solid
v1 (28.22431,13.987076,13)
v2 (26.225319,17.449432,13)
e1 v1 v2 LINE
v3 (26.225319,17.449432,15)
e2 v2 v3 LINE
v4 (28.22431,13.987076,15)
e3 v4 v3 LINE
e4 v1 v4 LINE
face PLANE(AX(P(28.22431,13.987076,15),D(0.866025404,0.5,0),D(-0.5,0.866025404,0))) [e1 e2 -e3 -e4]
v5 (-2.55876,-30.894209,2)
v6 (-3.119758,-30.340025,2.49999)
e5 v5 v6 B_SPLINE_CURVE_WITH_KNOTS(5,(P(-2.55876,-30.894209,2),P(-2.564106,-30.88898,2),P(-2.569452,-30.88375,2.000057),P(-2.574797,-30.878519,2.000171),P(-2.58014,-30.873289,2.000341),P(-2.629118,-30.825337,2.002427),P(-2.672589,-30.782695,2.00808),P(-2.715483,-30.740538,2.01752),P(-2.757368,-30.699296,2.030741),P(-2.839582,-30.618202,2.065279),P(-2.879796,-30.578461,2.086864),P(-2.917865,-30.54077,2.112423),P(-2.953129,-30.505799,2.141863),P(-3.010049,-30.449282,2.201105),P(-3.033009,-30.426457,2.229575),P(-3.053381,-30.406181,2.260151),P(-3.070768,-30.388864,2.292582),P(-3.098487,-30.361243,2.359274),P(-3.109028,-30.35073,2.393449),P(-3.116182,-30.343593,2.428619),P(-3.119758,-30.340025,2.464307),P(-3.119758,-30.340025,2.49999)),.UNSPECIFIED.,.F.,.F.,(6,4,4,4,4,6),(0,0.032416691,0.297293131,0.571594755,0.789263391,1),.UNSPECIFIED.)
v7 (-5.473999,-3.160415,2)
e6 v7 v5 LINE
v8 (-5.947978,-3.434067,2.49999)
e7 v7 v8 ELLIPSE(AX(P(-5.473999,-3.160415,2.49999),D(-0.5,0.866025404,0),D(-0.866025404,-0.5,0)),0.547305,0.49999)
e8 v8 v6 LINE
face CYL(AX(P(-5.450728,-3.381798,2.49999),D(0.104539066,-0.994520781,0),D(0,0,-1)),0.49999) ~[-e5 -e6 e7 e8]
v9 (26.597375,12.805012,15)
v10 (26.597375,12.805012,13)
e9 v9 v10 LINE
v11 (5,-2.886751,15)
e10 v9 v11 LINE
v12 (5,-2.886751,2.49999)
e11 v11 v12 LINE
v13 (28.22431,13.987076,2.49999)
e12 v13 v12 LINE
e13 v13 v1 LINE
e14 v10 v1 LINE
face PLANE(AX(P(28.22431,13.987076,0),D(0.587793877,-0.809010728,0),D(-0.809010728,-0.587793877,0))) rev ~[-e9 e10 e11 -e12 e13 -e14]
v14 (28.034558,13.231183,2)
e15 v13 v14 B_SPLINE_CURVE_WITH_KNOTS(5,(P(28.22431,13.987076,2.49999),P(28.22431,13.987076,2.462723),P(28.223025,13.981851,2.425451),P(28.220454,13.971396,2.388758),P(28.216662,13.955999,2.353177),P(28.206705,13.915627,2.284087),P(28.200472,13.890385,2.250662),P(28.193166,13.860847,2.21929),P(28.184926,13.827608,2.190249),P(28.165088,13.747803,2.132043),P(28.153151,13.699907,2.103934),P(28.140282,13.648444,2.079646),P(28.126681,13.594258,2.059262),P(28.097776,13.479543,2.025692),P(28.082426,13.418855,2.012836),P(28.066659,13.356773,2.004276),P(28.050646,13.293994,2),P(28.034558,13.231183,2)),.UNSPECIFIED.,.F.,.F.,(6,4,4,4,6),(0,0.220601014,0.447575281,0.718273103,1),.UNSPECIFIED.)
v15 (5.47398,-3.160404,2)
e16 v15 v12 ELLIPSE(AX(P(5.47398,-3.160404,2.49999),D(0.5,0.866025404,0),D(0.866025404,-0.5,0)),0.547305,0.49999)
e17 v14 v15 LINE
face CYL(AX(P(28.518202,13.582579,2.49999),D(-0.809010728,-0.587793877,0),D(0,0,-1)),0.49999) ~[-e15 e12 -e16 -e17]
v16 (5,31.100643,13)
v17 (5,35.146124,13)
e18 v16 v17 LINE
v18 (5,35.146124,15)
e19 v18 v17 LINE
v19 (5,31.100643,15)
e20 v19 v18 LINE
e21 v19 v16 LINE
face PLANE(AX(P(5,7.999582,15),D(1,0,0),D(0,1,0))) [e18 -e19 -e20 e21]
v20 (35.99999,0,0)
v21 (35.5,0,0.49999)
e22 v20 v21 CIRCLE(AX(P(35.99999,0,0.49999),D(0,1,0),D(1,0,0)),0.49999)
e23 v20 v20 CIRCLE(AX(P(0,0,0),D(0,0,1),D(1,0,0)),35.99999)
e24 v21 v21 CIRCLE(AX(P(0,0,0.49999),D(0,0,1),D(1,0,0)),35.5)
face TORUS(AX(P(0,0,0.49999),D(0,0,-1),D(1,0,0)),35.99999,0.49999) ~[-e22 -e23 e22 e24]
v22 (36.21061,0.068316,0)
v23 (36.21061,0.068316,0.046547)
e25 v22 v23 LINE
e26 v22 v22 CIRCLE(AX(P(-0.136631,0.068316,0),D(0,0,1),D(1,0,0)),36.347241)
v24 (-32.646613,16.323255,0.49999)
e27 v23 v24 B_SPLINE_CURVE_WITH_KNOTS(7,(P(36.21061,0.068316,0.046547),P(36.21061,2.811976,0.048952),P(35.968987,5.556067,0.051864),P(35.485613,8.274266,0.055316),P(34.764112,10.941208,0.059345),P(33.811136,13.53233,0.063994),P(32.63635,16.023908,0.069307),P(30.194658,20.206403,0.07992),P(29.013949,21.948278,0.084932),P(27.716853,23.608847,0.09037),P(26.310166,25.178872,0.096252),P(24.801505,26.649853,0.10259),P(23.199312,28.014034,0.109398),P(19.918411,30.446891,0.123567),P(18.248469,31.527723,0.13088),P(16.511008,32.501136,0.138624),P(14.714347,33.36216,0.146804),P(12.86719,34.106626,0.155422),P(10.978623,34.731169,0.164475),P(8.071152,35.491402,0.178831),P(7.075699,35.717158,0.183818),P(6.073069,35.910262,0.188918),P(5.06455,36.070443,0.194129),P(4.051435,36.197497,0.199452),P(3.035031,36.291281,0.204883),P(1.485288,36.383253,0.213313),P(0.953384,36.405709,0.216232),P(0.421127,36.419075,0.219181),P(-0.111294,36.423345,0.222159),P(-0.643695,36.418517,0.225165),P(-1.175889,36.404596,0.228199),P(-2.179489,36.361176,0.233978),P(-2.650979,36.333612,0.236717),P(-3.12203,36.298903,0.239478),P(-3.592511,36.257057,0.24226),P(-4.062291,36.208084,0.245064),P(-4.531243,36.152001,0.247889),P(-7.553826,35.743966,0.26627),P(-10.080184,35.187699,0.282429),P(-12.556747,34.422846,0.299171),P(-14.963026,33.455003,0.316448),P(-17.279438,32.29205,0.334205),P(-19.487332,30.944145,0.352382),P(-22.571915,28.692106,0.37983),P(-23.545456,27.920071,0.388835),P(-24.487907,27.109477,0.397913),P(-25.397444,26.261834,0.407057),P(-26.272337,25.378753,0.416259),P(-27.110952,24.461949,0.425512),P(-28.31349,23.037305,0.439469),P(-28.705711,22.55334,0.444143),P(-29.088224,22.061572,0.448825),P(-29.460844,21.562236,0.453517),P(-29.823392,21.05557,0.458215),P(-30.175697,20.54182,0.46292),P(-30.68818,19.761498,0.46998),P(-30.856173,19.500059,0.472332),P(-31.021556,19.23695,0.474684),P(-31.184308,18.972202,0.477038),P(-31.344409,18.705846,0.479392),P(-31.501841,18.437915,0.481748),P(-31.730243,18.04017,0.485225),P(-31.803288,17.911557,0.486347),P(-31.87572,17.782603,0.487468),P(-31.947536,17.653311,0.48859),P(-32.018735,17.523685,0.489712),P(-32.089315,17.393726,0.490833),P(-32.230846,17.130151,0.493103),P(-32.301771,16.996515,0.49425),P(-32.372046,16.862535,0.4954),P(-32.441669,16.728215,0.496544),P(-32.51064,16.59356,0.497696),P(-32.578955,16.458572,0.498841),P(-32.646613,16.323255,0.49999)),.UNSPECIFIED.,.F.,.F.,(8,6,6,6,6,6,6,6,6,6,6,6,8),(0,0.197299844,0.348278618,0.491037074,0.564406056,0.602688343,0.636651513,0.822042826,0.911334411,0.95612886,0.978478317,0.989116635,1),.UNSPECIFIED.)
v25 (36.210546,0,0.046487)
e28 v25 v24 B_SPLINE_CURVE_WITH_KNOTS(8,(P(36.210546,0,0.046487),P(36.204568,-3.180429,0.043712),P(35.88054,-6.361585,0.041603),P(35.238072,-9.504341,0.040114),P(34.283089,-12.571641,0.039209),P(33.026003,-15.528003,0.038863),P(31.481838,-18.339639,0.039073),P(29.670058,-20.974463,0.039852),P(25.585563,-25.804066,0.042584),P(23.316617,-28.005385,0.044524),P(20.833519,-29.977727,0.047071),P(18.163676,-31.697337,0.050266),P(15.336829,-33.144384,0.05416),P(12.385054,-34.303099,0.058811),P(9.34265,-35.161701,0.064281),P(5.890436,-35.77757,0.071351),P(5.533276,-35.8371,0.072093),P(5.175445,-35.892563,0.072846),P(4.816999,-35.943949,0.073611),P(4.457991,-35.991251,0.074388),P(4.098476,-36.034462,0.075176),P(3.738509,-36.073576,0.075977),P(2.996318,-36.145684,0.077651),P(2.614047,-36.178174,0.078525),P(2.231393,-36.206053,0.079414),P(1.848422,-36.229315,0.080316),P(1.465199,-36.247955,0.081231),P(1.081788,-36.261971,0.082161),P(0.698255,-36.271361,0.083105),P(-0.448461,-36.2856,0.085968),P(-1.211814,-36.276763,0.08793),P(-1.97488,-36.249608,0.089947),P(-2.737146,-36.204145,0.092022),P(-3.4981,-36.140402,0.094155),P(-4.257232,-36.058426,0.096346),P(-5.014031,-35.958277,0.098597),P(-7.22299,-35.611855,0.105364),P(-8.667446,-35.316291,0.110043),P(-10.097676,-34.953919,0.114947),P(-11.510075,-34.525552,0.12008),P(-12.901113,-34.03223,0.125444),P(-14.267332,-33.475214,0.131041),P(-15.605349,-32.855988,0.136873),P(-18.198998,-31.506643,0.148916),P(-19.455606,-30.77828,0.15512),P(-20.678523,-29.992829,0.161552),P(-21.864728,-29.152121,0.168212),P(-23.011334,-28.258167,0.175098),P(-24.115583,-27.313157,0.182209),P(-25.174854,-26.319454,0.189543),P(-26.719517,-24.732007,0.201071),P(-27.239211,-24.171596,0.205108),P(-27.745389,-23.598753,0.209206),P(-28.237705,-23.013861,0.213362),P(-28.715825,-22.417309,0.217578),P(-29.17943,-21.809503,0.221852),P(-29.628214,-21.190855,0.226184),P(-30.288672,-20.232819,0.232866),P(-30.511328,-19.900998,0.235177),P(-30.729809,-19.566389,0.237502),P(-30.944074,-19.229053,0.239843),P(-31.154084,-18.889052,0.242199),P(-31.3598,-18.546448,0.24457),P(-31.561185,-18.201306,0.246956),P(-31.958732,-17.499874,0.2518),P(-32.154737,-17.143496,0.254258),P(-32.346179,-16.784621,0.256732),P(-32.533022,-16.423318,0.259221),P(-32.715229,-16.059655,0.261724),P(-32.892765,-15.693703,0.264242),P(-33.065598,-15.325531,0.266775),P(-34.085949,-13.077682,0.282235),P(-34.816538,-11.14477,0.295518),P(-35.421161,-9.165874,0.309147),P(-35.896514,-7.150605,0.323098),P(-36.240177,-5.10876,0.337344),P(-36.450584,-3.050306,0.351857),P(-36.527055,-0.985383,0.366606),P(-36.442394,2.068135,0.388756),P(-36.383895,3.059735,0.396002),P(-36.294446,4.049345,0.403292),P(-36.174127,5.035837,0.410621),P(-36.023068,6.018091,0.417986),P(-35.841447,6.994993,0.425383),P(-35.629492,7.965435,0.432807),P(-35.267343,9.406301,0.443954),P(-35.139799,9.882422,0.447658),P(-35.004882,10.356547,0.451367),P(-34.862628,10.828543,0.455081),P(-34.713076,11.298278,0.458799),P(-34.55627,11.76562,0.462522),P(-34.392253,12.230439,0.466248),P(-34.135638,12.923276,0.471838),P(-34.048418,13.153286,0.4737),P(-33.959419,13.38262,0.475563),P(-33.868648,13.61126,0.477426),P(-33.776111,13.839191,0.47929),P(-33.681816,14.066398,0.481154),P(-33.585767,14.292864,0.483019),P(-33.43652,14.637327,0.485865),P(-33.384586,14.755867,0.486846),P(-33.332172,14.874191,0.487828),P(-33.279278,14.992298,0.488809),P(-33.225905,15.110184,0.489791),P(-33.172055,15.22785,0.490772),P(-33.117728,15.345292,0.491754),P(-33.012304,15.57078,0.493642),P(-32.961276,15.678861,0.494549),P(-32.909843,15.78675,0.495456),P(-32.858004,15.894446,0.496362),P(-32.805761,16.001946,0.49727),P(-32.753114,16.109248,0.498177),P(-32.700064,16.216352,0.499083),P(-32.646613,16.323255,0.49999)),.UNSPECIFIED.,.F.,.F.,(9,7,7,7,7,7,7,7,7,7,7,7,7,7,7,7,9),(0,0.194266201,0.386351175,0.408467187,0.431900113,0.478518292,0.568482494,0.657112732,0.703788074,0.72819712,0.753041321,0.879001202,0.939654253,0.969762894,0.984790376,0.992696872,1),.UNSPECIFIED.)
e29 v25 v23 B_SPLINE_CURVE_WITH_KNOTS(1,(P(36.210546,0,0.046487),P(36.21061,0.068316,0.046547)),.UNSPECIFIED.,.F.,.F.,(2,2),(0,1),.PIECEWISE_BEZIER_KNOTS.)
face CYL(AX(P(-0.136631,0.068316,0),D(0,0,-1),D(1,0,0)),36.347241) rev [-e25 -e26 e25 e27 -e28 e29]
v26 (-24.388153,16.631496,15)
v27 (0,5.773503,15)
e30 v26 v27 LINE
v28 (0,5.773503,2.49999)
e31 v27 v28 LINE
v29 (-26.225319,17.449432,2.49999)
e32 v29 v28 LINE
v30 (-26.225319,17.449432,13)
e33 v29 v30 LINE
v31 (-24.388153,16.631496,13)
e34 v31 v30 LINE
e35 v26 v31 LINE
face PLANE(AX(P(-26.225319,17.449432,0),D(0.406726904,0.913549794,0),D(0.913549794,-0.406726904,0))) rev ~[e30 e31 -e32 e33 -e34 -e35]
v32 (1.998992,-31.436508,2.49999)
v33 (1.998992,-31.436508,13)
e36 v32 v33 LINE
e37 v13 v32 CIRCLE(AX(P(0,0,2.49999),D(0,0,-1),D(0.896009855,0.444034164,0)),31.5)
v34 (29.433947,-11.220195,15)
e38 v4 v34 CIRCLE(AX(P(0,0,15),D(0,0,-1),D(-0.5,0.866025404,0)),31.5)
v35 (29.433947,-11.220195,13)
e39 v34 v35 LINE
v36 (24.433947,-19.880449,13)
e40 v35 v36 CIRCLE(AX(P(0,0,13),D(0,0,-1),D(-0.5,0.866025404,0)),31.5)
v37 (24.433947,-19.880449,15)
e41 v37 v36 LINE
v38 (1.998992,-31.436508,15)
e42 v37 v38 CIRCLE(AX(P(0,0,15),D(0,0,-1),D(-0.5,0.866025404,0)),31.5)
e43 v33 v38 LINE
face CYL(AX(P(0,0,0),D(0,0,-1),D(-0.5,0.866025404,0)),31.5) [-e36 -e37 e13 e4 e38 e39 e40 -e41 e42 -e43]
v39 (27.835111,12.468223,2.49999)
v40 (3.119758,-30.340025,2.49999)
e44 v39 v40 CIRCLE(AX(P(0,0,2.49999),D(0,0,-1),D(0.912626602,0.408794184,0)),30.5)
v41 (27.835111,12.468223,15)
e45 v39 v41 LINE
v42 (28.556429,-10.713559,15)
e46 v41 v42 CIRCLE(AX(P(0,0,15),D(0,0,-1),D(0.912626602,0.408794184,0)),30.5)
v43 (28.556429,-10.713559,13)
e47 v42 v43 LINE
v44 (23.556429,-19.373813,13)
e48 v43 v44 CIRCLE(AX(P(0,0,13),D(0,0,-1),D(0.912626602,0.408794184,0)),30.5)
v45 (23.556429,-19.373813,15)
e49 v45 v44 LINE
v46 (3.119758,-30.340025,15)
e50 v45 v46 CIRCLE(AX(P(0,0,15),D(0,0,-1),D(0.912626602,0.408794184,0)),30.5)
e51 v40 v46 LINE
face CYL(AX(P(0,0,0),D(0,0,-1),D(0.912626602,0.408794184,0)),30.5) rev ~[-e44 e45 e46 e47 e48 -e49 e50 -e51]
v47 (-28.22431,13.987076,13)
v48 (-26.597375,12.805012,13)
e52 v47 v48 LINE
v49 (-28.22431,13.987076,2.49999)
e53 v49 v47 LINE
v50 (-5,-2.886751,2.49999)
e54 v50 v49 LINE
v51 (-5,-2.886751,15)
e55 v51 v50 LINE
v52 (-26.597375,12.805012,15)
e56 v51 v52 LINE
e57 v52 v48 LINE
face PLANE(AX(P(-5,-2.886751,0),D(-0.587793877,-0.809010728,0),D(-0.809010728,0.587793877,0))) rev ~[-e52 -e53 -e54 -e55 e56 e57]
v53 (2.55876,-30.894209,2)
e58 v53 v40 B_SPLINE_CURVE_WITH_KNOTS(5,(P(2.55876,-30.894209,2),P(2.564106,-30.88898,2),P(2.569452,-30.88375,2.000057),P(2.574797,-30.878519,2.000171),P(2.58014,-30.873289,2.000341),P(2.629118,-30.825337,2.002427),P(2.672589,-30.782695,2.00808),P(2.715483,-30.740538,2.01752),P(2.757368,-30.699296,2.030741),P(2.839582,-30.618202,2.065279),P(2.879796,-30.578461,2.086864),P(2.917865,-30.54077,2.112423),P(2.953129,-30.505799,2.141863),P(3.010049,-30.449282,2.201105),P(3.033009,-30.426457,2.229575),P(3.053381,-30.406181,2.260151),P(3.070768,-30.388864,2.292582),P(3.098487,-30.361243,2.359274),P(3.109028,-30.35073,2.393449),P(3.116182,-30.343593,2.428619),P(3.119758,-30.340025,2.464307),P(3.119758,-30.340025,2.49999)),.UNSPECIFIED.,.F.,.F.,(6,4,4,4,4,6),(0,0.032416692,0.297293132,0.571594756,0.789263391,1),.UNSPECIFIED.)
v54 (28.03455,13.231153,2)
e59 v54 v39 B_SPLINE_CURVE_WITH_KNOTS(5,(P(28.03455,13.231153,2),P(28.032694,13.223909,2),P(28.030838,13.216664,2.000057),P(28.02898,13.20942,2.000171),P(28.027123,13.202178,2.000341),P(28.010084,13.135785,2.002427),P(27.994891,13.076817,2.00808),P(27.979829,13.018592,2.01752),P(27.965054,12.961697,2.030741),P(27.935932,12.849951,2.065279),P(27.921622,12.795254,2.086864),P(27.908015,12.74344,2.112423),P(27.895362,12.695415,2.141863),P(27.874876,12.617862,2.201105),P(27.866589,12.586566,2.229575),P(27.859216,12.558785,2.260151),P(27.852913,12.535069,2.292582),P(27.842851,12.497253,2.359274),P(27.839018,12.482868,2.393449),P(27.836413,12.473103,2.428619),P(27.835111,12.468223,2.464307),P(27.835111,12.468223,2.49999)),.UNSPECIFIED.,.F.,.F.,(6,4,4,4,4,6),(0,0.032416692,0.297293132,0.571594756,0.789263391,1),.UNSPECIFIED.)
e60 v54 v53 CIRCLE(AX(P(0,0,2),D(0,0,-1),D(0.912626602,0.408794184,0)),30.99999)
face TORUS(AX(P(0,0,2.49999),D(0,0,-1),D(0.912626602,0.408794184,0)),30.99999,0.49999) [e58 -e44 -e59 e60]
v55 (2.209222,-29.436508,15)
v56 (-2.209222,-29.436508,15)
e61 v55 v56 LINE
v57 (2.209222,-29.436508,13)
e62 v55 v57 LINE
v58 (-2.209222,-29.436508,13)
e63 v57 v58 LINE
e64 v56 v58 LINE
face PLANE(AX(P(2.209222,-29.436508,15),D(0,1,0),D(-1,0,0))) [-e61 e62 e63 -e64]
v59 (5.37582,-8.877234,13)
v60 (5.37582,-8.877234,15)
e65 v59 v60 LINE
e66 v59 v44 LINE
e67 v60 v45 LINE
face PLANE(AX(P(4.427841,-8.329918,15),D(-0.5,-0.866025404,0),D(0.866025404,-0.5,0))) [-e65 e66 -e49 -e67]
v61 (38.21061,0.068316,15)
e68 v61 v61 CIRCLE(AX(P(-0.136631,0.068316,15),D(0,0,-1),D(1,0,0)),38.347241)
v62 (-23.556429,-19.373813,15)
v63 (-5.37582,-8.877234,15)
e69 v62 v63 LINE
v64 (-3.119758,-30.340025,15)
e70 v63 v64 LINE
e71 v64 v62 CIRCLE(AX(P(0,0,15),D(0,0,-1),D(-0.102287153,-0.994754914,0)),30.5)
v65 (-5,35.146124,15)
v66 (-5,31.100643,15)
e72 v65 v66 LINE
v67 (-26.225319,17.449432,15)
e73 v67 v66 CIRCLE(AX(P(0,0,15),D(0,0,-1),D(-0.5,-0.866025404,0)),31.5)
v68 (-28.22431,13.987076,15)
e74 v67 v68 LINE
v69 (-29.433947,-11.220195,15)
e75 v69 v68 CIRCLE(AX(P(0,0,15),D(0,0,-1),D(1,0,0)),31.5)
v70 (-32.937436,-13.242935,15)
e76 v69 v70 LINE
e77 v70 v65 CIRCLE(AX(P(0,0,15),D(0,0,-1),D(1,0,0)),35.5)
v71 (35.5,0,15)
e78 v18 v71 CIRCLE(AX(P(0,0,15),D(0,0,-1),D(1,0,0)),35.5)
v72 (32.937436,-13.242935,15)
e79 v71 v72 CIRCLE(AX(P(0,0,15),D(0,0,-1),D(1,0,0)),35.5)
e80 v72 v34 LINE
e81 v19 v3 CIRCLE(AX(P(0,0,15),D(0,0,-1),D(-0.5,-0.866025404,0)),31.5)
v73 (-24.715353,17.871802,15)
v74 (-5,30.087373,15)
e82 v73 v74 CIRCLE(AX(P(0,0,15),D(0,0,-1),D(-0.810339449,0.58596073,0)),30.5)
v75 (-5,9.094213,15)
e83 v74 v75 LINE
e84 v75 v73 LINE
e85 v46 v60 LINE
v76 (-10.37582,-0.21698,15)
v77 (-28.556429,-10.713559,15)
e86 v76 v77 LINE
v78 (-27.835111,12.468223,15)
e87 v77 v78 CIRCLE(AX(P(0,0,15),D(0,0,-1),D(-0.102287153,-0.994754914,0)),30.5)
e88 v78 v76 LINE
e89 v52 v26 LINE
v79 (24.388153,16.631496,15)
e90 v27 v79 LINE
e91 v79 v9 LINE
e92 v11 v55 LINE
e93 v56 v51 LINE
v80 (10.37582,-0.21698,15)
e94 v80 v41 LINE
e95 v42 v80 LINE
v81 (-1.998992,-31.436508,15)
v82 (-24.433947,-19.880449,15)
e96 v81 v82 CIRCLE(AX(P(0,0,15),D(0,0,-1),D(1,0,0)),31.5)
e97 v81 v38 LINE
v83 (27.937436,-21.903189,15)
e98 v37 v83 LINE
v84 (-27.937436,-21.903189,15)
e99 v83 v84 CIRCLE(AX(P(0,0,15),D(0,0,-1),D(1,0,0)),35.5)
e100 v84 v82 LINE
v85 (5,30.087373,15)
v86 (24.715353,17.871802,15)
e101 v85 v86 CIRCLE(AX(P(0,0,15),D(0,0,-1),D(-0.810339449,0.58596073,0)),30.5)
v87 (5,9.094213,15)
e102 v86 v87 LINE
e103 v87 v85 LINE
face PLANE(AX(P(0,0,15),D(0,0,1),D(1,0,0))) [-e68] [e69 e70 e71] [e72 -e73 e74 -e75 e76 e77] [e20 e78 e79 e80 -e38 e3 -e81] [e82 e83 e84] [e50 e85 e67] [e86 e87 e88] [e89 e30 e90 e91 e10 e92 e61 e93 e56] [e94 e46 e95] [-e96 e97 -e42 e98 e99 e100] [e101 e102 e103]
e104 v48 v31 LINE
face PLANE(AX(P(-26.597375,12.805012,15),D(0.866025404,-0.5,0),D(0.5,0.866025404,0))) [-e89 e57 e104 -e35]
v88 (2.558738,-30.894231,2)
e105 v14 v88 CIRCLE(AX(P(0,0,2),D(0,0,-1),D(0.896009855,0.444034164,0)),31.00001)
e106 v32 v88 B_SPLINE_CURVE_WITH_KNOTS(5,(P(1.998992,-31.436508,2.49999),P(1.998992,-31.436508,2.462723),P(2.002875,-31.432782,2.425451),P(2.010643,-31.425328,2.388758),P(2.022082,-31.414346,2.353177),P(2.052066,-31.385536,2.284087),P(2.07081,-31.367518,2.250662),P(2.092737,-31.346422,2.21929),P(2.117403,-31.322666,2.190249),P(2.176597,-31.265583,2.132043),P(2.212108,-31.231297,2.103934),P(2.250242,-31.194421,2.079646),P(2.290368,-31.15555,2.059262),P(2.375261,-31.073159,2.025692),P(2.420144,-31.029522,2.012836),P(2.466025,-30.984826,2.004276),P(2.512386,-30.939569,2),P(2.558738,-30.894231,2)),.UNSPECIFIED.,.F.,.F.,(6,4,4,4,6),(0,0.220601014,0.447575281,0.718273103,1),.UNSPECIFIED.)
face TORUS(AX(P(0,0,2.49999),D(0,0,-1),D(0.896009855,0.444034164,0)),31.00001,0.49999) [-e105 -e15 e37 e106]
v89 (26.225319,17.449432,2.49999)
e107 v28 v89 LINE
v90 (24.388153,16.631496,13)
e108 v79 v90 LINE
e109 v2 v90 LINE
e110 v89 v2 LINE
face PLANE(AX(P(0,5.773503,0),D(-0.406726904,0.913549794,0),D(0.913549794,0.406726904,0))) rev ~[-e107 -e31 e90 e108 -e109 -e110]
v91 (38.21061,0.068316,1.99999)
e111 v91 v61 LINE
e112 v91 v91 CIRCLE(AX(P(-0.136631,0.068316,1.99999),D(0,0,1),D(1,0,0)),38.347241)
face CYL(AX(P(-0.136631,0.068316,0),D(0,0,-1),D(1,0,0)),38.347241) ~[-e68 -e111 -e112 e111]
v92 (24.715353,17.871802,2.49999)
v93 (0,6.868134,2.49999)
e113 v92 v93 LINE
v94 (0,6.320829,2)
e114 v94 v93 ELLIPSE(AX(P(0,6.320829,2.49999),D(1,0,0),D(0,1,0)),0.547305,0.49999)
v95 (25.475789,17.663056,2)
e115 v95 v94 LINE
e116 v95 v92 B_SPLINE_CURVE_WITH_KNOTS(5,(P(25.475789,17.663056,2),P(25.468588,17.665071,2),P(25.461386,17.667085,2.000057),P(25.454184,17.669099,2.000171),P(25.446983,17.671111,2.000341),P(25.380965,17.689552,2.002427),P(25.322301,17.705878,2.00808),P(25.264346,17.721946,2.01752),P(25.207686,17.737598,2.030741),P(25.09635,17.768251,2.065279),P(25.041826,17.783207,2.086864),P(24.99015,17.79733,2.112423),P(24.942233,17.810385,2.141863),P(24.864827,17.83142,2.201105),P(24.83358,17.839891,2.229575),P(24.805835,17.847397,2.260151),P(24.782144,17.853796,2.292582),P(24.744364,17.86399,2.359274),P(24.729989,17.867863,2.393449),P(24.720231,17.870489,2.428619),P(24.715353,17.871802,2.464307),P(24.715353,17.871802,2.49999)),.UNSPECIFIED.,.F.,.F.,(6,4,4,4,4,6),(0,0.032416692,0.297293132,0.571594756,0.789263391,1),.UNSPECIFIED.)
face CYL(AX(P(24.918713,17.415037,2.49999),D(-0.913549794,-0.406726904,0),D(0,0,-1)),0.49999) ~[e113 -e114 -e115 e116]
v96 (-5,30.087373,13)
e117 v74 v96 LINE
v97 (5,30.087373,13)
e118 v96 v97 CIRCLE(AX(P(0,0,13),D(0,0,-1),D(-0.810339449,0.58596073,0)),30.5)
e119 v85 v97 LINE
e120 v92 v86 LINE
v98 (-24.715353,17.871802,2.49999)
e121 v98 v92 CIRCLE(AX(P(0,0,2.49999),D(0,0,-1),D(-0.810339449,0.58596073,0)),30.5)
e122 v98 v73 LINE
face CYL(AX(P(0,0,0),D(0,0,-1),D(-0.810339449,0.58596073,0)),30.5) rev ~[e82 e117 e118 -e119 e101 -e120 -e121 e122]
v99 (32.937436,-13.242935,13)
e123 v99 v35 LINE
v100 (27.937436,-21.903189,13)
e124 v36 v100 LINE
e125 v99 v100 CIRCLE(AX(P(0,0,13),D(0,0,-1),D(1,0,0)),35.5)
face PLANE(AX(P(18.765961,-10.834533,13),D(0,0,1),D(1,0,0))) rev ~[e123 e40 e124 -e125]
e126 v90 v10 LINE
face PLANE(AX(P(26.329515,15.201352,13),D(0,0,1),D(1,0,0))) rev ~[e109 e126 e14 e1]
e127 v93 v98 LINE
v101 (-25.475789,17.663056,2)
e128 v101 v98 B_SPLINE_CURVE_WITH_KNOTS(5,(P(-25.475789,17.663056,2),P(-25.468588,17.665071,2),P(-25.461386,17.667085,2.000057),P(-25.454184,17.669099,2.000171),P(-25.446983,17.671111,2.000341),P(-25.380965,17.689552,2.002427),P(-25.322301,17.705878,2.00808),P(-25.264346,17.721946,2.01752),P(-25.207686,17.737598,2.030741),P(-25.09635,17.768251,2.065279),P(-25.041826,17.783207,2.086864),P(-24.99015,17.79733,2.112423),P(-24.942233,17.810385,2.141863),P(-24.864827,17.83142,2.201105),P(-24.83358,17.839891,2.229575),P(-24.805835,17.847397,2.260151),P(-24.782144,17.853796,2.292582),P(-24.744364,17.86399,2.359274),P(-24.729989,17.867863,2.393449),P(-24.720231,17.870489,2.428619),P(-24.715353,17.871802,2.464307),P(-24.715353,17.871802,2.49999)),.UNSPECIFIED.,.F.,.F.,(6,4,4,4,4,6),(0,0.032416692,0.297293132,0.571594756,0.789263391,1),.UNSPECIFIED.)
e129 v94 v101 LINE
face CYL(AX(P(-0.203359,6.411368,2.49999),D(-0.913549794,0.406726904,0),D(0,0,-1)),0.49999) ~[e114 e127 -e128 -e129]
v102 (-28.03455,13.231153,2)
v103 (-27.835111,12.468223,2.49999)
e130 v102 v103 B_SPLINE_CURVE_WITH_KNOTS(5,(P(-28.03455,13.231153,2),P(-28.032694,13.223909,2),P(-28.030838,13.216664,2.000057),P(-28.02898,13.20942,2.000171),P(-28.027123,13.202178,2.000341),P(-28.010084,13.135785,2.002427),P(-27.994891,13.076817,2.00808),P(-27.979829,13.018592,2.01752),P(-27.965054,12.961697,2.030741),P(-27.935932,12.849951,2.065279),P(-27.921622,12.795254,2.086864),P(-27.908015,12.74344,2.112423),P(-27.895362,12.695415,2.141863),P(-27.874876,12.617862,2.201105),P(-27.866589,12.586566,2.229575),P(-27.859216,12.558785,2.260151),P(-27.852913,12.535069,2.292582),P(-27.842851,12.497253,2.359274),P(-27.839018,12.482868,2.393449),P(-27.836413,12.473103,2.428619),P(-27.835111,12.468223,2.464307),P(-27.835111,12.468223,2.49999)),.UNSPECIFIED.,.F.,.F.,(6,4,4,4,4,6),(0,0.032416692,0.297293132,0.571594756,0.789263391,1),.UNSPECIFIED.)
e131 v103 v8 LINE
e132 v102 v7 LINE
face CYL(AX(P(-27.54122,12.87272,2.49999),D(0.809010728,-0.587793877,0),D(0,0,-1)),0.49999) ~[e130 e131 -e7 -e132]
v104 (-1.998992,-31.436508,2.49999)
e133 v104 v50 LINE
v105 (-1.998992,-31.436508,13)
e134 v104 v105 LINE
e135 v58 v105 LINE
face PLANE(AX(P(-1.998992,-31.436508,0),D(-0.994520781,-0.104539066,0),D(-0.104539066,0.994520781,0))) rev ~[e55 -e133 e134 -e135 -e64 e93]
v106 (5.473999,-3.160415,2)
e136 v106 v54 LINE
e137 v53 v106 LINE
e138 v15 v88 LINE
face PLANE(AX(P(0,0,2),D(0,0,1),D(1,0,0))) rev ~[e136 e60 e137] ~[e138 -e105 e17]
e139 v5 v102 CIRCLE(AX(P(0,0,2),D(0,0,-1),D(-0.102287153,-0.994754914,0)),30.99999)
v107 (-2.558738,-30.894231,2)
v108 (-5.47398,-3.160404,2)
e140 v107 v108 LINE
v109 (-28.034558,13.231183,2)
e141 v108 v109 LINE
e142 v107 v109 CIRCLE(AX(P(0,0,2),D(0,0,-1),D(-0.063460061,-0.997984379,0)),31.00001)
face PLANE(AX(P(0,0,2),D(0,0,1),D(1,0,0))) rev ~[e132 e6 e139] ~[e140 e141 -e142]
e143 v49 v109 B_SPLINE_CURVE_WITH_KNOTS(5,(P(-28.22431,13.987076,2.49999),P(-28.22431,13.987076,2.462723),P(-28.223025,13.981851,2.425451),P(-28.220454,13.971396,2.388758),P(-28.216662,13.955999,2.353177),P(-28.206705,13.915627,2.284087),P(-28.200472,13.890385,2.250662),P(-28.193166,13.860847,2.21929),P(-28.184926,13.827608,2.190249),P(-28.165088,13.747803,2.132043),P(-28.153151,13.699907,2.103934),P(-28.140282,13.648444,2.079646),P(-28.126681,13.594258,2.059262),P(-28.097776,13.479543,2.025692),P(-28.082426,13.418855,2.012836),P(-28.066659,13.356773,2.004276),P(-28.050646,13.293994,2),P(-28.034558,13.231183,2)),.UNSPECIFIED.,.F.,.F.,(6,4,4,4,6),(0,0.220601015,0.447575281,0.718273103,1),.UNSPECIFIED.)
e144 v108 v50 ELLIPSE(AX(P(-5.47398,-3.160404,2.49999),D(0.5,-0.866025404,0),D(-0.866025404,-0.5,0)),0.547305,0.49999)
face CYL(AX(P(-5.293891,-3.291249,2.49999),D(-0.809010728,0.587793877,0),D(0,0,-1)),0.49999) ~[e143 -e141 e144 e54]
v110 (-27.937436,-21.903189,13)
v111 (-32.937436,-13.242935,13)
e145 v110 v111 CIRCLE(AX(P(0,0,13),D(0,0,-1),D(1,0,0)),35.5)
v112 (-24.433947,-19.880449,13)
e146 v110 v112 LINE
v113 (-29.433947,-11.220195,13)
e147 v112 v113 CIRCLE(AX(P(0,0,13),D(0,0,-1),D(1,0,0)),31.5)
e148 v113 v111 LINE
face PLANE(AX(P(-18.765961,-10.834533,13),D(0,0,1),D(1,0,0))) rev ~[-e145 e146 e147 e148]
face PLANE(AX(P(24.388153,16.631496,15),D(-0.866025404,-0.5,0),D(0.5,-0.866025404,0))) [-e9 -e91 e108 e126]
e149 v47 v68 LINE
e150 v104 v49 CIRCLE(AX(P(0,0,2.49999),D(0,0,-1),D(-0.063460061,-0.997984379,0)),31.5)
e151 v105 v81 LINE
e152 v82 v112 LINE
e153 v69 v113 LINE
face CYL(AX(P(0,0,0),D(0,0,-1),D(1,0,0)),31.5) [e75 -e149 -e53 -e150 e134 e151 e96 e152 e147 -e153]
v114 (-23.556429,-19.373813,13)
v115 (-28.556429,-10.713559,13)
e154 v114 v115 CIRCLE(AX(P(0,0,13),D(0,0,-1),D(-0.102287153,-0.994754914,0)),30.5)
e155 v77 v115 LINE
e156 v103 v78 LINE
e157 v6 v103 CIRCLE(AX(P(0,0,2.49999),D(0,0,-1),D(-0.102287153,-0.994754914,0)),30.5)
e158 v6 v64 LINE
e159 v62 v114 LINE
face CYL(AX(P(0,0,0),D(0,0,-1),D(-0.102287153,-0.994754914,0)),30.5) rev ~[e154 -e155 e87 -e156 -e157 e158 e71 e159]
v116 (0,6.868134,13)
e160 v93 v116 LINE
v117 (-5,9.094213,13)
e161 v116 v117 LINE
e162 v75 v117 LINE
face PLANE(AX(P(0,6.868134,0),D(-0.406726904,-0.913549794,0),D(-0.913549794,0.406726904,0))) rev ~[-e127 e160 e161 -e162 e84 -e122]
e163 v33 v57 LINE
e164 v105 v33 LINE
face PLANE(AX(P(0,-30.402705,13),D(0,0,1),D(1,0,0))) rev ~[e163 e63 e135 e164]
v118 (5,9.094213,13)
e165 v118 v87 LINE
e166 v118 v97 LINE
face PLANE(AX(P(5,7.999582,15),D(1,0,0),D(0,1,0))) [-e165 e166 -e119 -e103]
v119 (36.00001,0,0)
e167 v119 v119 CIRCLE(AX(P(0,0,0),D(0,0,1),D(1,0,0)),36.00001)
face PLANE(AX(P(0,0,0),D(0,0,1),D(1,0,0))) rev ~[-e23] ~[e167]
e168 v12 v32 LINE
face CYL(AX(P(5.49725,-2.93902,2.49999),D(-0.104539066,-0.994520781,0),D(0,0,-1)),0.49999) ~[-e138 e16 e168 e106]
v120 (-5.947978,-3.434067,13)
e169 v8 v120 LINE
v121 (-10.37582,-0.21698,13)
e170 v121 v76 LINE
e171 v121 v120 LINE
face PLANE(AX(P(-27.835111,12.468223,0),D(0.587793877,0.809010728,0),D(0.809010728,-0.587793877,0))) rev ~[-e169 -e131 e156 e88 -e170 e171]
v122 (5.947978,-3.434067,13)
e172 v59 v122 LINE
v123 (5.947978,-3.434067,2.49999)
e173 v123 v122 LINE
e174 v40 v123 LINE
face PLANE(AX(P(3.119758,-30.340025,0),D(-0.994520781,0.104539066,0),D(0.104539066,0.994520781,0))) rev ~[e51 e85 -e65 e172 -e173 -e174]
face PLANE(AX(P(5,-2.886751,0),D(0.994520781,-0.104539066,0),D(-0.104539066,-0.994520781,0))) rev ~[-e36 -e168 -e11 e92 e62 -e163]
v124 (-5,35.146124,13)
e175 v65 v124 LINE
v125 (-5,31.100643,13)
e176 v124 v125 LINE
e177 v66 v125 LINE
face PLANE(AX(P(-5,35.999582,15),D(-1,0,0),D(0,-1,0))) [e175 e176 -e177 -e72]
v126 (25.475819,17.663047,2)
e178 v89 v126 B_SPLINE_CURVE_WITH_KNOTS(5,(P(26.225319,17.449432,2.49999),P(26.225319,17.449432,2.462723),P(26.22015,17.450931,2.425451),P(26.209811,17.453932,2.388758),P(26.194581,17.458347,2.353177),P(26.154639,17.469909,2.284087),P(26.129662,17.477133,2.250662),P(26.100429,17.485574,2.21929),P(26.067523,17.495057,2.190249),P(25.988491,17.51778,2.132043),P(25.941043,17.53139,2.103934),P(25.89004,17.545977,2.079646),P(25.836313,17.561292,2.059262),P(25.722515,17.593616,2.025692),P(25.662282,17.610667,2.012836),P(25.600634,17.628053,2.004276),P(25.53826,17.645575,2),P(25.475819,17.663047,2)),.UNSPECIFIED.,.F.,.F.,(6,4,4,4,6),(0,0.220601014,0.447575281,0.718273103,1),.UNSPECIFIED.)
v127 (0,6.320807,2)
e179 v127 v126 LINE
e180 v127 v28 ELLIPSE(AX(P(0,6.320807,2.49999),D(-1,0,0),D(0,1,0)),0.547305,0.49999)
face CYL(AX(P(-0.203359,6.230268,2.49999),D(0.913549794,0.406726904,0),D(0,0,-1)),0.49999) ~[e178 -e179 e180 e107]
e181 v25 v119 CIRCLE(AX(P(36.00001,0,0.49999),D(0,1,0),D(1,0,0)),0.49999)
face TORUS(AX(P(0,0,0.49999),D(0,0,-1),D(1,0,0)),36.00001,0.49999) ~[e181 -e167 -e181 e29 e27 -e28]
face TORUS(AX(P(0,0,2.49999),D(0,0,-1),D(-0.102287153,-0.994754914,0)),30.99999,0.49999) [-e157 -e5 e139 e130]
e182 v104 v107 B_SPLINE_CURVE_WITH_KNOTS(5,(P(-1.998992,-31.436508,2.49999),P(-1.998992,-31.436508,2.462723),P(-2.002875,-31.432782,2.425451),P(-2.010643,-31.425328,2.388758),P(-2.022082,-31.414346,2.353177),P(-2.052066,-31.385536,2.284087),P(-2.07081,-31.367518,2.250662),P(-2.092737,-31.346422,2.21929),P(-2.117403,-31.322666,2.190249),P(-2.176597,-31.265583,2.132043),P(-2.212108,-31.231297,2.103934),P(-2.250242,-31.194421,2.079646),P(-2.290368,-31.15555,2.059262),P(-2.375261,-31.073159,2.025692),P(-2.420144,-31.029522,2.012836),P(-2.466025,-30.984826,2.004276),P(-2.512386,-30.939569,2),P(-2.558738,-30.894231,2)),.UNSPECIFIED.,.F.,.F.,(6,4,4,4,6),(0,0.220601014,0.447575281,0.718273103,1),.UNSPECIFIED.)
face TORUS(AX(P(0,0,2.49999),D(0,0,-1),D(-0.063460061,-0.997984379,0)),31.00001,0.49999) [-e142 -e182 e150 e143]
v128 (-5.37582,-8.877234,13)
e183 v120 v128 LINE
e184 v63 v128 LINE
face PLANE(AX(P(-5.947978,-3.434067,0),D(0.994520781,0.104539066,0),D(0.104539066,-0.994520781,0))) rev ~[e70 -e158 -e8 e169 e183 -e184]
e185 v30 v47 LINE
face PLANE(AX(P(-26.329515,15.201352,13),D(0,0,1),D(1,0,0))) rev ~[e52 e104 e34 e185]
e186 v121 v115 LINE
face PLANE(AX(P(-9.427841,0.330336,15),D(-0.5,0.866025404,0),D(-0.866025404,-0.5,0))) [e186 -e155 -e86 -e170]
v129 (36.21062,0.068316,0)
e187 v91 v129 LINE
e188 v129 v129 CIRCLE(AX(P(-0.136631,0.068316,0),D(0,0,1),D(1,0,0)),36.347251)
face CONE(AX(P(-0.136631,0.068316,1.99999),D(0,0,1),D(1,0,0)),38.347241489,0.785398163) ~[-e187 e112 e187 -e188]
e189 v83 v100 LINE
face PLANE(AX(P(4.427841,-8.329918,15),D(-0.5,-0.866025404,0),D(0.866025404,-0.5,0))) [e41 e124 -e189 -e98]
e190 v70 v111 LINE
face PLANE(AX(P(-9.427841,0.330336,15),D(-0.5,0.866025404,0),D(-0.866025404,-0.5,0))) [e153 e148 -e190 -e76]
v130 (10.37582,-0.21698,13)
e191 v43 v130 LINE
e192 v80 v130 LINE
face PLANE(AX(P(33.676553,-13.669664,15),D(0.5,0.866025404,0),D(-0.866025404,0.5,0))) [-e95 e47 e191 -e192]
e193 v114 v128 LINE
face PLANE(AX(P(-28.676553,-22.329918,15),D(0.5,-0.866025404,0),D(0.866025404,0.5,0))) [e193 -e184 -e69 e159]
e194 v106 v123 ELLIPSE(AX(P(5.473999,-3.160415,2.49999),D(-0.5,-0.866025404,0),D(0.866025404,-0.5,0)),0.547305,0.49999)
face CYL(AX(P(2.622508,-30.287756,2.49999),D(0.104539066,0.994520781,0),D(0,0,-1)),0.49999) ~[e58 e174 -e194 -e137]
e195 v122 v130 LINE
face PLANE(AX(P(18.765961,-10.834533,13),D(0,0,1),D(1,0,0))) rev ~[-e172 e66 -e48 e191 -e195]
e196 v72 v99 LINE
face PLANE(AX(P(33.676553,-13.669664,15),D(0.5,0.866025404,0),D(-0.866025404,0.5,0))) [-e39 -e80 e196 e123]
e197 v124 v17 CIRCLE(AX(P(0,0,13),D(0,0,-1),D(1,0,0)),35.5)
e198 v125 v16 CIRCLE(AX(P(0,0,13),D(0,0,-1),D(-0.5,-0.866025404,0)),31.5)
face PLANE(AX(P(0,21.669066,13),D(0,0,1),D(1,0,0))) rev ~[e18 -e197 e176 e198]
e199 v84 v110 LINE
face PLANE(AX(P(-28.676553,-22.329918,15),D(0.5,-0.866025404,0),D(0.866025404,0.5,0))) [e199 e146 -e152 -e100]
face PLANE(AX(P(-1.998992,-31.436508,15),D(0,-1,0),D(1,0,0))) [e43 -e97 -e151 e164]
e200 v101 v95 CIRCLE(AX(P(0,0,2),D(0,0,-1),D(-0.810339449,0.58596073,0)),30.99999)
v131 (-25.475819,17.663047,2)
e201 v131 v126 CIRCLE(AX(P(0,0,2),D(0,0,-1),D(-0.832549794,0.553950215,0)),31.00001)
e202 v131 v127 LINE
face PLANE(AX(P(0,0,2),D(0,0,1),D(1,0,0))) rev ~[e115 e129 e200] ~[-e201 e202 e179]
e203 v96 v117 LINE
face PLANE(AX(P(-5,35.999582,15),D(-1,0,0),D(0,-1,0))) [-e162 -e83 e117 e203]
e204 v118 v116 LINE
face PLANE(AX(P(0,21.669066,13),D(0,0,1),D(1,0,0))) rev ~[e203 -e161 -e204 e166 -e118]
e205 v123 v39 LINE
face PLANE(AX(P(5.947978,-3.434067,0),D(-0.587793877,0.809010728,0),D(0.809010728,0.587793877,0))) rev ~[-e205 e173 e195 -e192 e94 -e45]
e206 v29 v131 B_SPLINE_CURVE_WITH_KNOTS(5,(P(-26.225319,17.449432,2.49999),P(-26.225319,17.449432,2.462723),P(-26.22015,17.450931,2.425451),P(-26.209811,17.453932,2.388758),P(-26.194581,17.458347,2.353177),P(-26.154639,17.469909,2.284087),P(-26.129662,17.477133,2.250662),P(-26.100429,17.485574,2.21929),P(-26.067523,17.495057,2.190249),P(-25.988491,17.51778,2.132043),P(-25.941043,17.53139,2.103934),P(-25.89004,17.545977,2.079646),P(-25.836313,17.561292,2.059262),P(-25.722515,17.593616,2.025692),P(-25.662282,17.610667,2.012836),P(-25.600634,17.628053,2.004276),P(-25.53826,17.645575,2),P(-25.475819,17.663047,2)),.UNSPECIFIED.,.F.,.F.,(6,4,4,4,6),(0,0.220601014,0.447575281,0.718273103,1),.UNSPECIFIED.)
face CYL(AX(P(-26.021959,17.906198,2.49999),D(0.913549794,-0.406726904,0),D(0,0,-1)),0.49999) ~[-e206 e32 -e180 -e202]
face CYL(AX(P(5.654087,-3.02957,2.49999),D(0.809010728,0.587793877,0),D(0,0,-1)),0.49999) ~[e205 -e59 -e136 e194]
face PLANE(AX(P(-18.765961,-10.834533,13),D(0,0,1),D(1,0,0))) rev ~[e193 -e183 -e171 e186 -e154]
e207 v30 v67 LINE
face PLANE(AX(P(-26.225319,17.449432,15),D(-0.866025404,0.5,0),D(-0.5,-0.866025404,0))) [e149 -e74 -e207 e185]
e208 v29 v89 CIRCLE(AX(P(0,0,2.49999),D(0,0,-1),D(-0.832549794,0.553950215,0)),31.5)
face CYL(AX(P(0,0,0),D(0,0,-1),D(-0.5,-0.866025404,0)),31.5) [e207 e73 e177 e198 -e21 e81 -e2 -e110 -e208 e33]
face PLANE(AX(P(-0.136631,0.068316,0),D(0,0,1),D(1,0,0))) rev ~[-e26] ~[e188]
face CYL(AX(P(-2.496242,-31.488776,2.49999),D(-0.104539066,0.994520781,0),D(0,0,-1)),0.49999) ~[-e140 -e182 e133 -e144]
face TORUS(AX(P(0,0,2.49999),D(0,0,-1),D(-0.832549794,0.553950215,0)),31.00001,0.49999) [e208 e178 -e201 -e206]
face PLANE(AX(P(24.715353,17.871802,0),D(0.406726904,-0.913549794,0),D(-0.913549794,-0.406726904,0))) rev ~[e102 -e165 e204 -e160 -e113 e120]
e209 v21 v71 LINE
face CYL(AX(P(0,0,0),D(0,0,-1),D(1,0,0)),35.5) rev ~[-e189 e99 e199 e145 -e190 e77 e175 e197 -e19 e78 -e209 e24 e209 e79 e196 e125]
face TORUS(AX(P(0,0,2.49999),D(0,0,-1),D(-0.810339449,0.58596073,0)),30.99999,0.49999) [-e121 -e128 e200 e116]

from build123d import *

# Parameters (mm, degrees)
F0_R      = 36.5
F1_DEPTH  = 20
F2_R      = 35.5
F2_R_2    = 31.5
F3_DEPTH  = 20.001
F5_DEPTH  = 20.001
F8_DEPTH  = 20.001
F10_COUNT = 3
F11_R     = 32.9719695727
F12_DEPTH = 2
F13_R     = 36.5
F14_DEPTH = 5
F15_R     = 0.49999
F16_R     = 38.3472414885
F16_R_2   = 36.3472414885
F17_DEPTH = 20
F18_SIZE  = 1.99999
F19_R     = 41.0530040579
F20_DEPTH = 5
F22_DEPTH = 2


# Not quite as in the source:
# - a fillet or chamfer is up to 0.001 mm smaller than in the source, because OpenCascade refuses the exact size


with BuildPart() as f1:
    # F0 (on Top) → F1 (new body)
    with BuildSketch(Plane.XY):
        Circle(F0_R)
    extrude(amount=F1_DEPTH)

    # F2 (on face) → F3 (cut, through all)
    with BuildSketch(Plane(origin=(0, 0, 0), x_dir=(1, 0, 0), z_dir=(0, 0, -1))):
        Circle(F2_R)
        Circle(F2_R_2, mode=Mode.SUBTRACT)
    extrude(amount=-F3_DEPTH, mode=Mode.SUBTRACT)

    # F4 (on face) → F5 (cut, through all)
    with BuildSketch(Plane(origin=(0, 0, 0), x_dir=(1, 0, 0), z_dir=(0, 0, -1))):
        with BuildLine():
            Line((-5, 2.8867513459), (0, 0))
            Line((0, 0), (0, 31.5))
            ThreePointArc((0, 31.5), (-1, 31.4841229829), (-1.9989919354, 31.4365079365))
            Line((-1.9989919354, 31.4365079365), (-5, 2.8867513459))
        make_face()
        with BuildLine():
            Line((0, 31.5), (0, 0))
            Line((0, 0), (27.2798002192, -15.75))
            ThreePointArc((27.2798002192, -15.75), (27.766050319, -14.8760360876), (28.224310447, -13.9870761702))
            Line((28.224310447, -13.9870761702), (5, 2.8867513459))
            Line((5, 2.8867513459), (1.9989919354, 31.4365079365))
            ThreePointArc((1.9989919354, 31.4365079365), (1, 31.4841229829), (0, 31.5))
        make_face()
        with BuildLine():
            Line((-27.2798002192, -15.75), (0, 0))
            Line((0, 0), (-5, 2.8867513459))
            Line((-5, 2.8867513459), (-28.224310447, -13.9870761702))
            ThreePointArc((-28.224310447, -13.9870761702), (-27.766050319, -14.8760360876), (-27.2798002192, -15.75))
        make_face()
        with BuildLine():
            Line((27.2798002192, -15.75), (0, 0))
            Line((0, 0), (-27.2798002192, -15.75))
            ThreePointArc((-27.2798002192, -15.75), (-26.766050319, -16.6080868952), (-26.2253185116, -17.4494317663))
            Line((-26.2253185116, -17.4494317663), (0, -5.7735026919))
            Line((0, -5.7735026919), (26.2253185116, -17.4494317663))
            ThreePointArc((26.2253185116, -17.4494317663), (26.766050319, -16.6080868952), (27.2798002192, -15.75))
        make_face()
    extrude(amount=-F5_DEPTH, mode=Mode.SUBTRACT)

    # F7 (on face) → F8 (cut, through all)
    with BuildSketch(Plane(origin=(0, 0, 0), x_dir=(1, 0, 0), z_dir=(0, 0, -1))):
        with BuildLine():
            Line((-5.9479783255, 3.4340668874), (-3.119758175, 30.340024867))
            ThreePointArc((-3.119758175, 30.340024867), (-26.4137748154, 15.25), (-27.8351113737, -12.4682226003))
            Line((-27.8351113737, -12.4682226003), (-5.9479783255, 3.4340668874))
        make_face()
        Polygon((0, 33.3932489157), (0, 0), (-27.0690638572, -15.5309122056), (-27.0690638572, -19.8186486959), (-19.1532429308, -28.0642919242), (-5.5204438977, -33.4514454007), (14.1841255464, -31.0257077197), (26.5826005489, -22.0174863935), (32.7393487096, -5.7460800745), (32.7393487096, 6.6773579456), (25.4831798375, 23.2785902917), (10.75096149, 31.7441187799), align=None)
    extrude(amount=-F8_DEPTH, mode=Mode.SUBTRACT)


with BuildPart() as f10_1:
    # F10: instance of F1
    add(f1.part.rotate(Axis((0, 0, 8.8435821235), (0, 0, 1)), 1 * 360 / F10_COUNT))


with BuildPart() as f10_2:
    # F10: instance of F1
    add(f1.part.rotate(Axis((0, 0, 8.8435821235), (0, 0, 1)), 2 * 360 / F10_COUNT))


with BuildPart() as f12_tool:
    # F11 (on Top) → F12 (new body)
    with BuildSketch(Plane.XY):
        Circle(F11_R)
    extrude(amount=F12_DEPTH)


with BuildPart() as f1_1:
    add(f1.part)

    # F12: cut by f12_tool
    add(f12_tool.part, mode=Mode.SUBTRACT)



with BuildPart() as f10_1_1:
    add(f10_1.part)

    # F12: cut by f12_tool
    add(f12_tool.part, mode=Mode.SUBTRACT)


with BuildPart() as f10_2_1:
    add(f10_2.part)

    # F12: cut by f12_tool
    add(f12_tool.part, mode=Mode.SUBTRACT)


with BuildPart() as f1_2:
    add(f1_1.part)

    add(f10_1_1.part)  # F14 merges F10_1

    add(f10_2_1.part)  # F14 merges F10_2
    # F13 (on face) → F14 (join)
    with BuildSketch(Plane.XY.offset(20)):
        Circle(F13_R)
    extrude(amount=-F14_DEPTH)

    # F15 (radius 0.5 in the source; OpenCascade refuses exactly that, so slightly less here)
    f15_edges = [f1_2.edges().sort_by_distance(p)[0] for p in [
        (17.75, 30.743902, 0),
        (18.25, 31.609927, 0),
        (-27.2798, -15.75, 2),
        (-16.612155, 5.550162, 2),
        (-3.499496, -17.16163, 2),
        (-26.413775, -15.25, 2),
        (-4.533868, -16.887046, 2),
        (-16.891545, 4.517078, 2),
        (0, 31.5, 2),
        (13.112659, 11.611467, 2),
        (-13.112659, 11.611467, 2),
        (0, 30.5, 2),
        (-12.357677, 12.369968, 2),
        (12.357677, 12.369968, 2),
        (27.2798, -15.75, 2),
        (3.499496, -17.16163, 2),
        (16.612155, 5.550162, 2),
        (26.413775, -15.25, 2),
        (16.891545, 4.517078, 2),
        (4.533868, -16.887046, 2),
    ]]
    fillet(f15_edges, radius=F15_R)

    # F16 (on Top) → F17 (join)
    with BuildSketch(Plane.XY):
        with Locations((-0.1366314536, 0.0683155085)):
            Circle(F16_R)
        with Locations((-0.1366314536, 0.0683155085)):
            Circle(F16_R_2, mode=Mode.SUBTRACT)
    extrude(amount=F17_DEPTH)

    # F18 (size 2 in the source; OpenCascade refuses exactly that, so slightly less here)
    f18_edges = [f1_2.edges().sort_by_distance(p)[0] for p in [
        (-38.483873, 0.068316, 0),
    ]]
    chamfer(f18_edges, length=F18_SIZE)

    # F19 (on face) → F20 (cut)
    with BuildSketch(Plane.XY.offset(20)):
        Circle(F19_R)
    extrude(amount=-F20_DEPTH, mode=Mode.SUBTRACT)

    # F21 (on face) → F22 (join)
    with BuildSketch(Plane.XY.offset(15)):
        Polygon((-28.6765527518, -22.3299181426), (-4.4278414458, -8.3299181426), (-5, -2.8867513459), (-9.4278414458, 0.3303358953), (-33.6765527518, -13.6696641047), (-31.1765527518, -17.9997911236), align=None)
        Polygon((4.4278414458, -8.3299181426), (28.6765527518, -22.3299181426), (31.1765527518, -17.9997911236), (33.6765527518, -13.6696641047), (9.4278414458, 0.3303358953), (5, -2.8867513459), align=None)
        Polygon((5, 7.9995822473), (5, 35.9995822473), (0, 35.9995822473), (-5, 35.9995822473), (-5, 7.9995822473), (0, 5.7735026919), align=None)
        Polygon((-26.2253185116, 17.4494317663), (-28.224310447, 13.9870761702), (-26.5973746535, 12.8050116253), (-24.38815269, 16.6314963112), align=None)
        Polygon((2.2092219635, -29.4365079365), (-2.2092219635, -29.4365079365), (-1.9989919354, -31.4365079365), (1.9989919354, -31.4365079365), align=None)
        Polygon((24.38815269, 16.6314963112), (26.5973746535, 12.8050116253), (28.224310447, 13.9870761702), (26.2253185116, 17.4494317663), align=None)
    extrude(amount=-F22_DEPTH)


solid = f1_2.part
